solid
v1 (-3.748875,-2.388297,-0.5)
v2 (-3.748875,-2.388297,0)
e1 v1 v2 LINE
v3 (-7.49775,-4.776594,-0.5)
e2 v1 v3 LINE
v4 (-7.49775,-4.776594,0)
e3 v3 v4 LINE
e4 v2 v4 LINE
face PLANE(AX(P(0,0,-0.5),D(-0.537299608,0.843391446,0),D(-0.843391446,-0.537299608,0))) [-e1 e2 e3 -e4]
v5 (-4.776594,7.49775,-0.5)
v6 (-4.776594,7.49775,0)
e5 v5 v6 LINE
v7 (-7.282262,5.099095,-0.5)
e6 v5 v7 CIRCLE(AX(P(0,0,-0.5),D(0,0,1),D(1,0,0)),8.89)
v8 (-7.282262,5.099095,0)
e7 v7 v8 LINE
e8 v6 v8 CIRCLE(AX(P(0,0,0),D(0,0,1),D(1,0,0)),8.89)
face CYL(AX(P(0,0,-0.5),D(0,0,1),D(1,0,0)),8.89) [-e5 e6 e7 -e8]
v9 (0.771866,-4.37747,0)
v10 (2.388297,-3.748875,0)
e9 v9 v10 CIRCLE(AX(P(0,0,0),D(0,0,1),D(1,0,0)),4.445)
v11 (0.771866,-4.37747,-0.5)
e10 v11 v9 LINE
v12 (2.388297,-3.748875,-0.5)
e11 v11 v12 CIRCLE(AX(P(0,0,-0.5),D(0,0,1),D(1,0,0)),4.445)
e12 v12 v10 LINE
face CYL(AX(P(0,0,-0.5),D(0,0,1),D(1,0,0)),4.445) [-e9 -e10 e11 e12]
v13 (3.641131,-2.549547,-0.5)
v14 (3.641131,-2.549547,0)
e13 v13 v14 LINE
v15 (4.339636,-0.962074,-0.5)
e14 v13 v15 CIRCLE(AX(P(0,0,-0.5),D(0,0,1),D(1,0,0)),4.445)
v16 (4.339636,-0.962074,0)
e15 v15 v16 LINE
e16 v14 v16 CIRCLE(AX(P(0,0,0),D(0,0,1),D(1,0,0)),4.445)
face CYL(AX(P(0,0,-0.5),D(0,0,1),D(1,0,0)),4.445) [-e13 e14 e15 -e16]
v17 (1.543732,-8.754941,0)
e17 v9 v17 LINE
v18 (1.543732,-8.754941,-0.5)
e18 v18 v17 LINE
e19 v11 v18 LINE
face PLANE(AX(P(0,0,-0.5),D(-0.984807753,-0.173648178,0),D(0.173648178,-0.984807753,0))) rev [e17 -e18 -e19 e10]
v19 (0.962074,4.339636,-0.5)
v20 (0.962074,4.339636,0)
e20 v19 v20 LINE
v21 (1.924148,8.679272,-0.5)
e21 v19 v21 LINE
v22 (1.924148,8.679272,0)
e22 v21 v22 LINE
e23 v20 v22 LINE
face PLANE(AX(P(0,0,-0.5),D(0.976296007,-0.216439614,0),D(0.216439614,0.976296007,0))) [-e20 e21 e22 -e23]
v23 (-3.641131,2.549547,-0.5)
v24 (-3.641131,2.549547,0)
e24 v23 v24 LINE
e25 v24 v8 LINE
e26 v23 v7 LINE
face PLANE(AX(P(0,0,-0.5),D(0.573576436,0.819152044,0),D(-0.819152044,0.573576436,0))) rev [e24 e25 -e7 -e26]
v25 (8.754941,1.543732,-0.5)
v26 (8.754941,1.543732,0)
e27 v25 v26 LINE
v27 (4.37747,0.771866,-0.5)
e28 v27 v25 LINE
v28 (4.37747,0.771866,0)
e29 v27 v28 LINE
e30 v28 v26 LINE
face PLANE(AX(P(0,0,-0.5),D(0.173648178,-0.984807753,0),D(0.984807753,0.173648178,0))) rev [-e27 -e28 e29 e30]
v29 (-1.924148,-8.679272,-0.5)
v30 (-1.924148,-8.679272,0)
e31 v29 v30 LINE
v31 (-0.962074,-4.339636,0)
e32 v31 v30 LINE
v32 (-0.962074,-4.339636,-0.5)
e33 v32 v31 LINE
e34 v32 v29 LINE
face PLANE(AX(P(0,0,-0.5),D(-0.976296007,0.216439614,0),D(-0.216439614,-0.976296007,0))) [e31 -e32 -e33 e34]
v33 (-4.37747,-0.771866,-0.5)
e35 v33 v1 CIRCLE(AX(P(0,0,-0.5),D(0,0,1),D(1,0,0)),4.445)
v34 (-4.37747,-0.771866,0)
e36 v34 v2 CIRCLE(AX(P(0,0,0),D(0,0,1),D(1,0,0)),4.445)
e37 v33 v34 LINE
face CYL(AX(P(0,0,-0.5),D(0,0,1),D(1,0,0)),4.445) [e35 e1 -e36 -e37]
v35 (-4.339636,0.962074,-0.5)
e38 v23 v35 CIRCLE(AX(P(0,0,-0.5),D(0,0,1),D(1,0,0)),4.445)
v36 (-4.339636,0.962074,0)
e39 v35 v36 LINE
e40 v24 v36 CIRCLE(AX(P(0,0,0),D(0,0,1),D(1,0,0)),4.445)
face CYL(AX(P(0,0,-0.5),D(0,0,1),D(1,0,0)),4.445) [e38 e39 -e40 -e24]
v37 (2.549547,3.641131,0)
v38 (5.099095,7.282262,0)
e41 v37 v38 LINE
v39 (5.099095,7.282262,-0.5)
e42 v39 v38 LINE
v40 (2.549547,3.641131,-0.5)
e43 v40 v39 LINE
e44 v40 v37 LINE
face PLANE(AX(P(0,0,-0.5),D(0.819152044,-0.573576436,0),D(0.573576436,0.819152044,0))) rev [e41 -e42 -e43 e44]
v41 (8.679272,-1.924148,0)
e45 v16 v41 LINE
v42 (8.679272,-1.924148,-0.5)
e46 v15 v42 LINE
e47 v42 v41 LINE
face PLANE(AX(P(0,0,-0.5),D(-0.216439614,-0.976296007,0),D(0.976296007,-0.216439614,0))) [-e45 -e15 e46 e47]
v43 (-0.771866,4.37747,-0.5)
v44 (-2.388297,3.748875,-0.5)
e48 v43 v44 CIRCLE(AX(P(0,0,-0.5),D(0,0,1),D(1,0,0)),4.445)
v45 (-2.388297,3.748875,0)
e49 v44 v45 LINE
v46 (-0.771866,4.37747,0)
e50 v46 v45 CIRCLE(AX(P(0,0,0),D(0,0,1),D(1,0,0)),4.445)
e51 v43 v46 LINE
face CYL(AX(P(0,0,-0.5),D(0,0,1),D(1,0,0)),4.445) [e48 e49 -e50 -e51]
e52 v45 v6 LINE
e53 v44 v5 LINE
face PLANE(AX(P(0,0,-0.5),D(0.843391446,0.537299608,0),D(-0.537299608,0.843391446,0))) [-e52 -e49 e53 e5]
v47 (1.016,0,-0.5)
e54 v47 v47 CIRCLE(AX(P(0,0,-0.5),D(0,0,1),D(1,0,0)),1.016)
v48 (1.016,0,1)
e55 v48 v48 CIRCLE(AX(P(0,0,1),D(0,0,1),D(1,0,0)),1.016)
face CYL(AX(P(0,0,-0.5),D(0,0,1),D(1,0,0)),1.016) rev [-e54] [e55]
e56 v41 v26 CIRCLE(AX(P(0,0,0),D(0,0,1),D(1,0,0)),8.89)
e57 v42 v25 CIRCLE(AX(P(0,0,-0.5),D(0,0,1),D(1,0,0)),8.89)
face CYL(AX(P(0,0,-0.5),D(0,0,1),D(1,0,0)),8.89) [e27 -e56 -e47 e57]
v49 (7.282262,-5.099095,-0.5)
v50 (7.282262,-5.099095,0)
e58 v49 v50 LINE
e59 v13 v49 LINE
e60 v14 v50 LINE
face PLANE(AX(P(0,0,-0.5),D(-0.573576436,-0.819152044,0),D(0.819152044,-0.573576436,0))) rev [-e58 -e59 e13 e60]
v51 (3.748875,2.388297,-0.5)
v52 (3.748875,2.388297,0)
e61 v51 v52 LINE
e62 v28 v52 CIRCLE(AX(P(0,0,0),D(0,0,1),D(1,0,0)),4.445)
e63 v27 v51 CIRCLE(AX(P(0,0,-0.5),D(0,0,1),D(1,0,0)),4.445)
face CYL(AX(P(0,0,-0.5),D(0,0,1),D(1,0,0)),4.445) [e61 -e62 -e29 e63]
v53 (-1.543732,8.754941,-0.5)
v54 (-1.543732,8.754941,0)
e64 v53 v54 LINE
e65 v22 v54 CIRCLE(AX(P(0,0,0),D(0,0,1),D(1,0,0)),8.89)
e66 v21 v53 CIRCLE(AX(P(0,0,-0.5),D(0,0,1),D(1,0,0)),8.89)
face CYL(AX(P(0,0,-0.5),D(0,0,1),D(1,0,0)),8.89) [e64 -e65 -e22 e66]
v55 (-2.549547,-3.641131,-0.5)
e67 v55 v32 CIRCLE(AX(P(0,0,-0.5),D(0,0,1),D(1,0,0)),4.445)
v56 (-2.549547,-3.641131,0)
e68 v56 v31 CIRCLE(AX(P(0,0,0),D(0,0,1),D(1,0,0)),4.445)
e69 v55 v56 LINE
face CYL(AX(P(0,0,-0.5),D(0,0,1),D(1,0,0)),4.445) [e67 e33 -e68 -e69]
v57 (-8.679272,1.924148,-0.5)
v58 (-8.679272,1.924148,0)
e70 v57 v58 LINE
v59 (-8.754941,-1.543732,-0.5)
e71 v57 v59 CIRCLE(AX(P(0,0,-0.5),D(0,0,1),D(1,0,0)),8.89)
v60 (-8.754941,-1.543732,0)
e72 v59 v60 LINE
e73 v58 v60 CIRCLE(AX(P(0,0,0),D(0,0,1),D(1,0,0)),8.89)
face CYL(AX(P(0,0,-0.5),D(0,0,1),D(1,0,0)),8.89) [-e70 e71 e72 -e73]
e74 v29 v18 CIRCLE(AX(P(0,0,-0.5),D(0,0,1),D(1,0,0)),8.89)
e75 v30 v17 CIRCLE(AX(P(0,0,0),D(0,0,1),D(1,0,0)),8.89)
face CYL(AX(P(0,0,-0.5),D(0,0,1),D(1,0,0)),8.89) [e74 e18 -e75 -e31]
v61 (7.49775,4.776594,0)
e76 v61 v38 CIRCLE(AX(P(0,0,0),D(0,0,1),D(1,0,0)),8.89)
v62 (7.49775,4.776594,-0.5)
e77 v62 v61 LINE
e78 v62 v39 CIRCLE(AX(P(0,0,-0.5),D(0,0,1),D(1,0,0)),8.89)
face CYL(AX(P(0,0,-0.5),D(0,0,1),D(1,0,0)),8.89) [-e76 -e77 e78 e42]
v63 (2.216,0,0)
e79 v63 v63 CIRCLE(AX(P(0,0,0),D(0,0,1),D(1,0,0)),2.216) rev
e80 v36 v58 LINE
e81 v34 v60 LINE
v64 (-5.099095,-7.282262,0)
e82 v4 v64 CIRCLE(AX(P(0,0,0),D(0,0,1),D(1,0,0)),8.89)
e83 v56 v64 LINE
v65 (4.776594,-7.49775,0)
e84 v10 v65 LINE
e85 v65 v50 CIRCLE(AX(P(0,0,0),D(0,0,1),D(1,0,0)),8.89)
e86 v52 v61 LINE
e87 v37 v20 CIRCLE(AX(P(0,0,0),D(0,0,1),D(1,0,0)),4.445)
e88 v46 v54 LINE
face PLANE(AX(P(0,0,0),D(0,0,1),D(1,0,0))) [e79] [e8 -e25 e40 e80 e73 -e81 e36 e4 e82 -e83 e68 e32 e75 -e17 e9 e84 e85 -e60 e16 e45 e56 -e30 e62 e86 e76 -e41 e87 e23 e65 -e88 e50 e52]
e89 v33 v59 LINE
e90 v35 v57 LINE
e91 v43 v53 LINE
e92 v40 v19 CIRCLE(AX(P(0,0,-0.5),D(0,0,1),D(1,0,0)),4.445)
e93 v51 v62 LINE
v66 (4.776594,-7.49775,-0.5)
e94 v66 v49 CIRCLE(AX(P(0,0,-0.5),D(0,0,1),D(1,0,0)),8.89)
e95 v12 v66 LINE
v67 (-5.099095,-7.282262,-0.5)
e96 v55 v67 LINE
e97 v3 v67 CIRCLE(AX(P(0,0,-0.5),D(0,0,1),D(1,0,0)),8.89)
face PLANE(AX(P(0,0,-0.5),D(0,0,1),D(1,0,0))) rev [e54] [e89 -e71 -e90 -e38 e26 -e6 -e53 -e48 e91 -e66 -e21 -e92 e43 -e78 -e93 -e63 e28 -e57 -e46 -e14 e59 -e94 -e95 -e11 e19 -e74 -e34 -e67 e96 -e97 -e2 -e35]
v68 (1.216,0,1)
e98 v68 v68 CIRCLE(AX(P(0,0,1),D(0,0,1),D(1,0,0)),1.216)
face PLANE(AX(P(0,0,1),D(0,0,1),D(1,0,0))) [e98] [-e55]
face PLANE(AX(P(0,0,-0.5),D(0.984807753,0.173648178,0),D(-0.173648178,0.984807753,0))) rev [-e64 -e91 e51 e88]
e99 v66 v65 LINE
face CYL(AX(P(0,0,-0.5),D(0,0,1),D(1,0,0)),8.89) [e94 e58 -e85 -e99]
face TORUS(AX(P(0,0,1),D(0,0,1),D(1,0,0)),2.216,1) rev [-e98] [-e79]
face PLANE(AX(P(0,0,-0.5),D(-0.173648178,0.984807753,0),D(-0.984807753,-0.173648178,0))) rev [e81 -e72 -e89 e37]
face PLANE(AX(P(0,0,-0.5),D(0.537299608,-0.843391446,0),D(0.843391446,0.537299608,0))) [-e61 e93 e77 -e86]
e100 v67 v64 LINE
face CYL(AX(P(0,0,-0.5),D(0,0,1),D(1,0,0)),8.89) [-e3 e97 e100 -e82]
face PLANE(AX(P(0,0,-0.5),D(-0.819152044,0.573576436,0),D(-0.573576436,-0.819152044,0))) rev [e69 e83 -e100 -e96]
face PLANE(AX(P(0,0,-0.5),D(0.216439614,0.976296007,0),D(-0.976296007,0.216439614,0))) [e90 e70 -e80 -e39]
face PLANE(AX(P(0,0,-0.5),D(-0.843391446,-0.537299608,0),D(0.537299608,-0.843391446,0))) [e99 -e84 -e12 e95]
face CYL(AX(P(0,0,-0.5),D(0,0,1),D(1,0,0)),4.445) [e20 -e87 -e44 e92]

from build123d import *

# Parameters (mm, degrees)
SKETCH1_R           = 8.89
SKETCH1_R_2         = 1.016
BOSS_EXTRUDE1_DEPTH = 0.5
CUT_EXTRUDE1_DEPTH  = 0.5
BOSS_EXTRUDE2_START = 1
SKETCH3_R           = 1.216
SKETCH3_R_2         = 1.016
BOSS_EXTRUDE2_DEPTH = 1
FILLET1_R           = 1


with BuildPart() as part:
    # Sketch1 → Boss-Extrude1 (new body)
    with BuildSketch(Plane.XY):
        Circle(SKETCH1_R)
        Circle(SKETCH1_R_2, mode=Mode.SUBTRACT)
    extrude(amount=-BOSS_EXTRUDE1_DEPTH)

    # Sketch2 → Cut-Extrude1 (cut)
    with BuildSketch(Plane.XY):
        with BuildLine():
            ThreePointArc((-2.388296759, 3.748874977), (-1.61103708, 4.142774979), (-0.77186615, 4.377470462))
            Line((-0.77186615, 4.377470462), (-1.543732299, 8.754940924))
            ThreePointArc((-1.543732299, 8.754940924), (-3.22207416, 8.285549958), (-4.776593518, 7.497749953))
            Line((-4.776593518, 7.497749953), (-2.388296759, 3.748874977))
        make_face()
        with BuildLine():
            ThreePointArc((5.099094519, 7.282261674), (3.580418073, 8.137119049), (1.924148168, 8.679271503))
            Line((1.924148168, 8.679271503), (0.962074084, 4.339635752))
            ThreePointArc((0.962074084, 4.339635752), (1.790209036, 4.068559525), (2.54954726, 3.641130837))
            Line((2.54954726, 3.641130837), (5.099094519, 7.282261674))
        make_face()
        with BuildLine():
            ThreePointArc((8.754940924, 1.543732299), (8.285549958, 3.22207416), (7.497749953, 4.776593518))
            Line((7.497749953, 4.776593518), (3.748874977, 2.388296759))
            ThreePointArc((3.748874977, 2.388296759), (4.142774979, 1.61103708), (4.377470462, 0.77186615))
            Line((4.377470462, 0.77186615), (8.754940924, 1.543732299))
        make_face()
        with BuildLine():
            ThreePointArc((7.282261674, -5.099094519), (8.137119049, -3.580418073), (8.679271503, -1.924148168))
            Line((8.679271503, -1.924148168), (4.339635752, -0.962074084))
            ThreePointArc((4.339635752, -0.962074084), (4.068559525, -1.790209036), (3.641130837, -2.54954726))
            Line((3.641130837, -2.54954726), (7.282261674, -5.099094519))
        make_face()
        with BuildLine():
            ThreePointArc((1.543732299, -8.754940924), (3.22207416, -8.285549958), (4.776593518, -7.497749953))
            Line((4.776593518, -7.497749953), (2.388296759, -3.748874977))
            ThreePointArc((2.388296759, -3.748874977), (1.61103708, -4.142774979), (0.77186615, -4.377470462))
            Line((0.77186615, -4.377470462), (1.543732299, -8.754940924))
        make_face()
        with BuildLine():
            Line((-2.54954726, -3.641130837), (-5.099094519, -7.282261674))
            ThreePointArc((-5.099094519, -7.282261674), (-3.580418073, -8.137119049), (-1.924148168, -8.679271503))
            Line((-1.924148168, -8.679271503), (-0.962074084, -4.339635752))
            ThreePointArc((-0.962074084, -4.339635752), (-1.790209036, -4.068559525), (-2.54954726, -3.641130837))
        make_face()
        with BuildLine():
            Line((-4.377470462, -0.77186615), (-8.754940924, -1.543732299))
            ThreePointArc((-8.754940924, -1.543732299), (-8.285549958, -3.22207416), (-7.497749953, -4.776593518))
            Line((-7.497749953, -4.776593518), (-3.748874977, -2.388296759))
            ThreePointArc((-3.748874977, -2.388296759), (-4.142774979, -1.61103708), (-4.377470462, -0.77186615))
        make_face()
        with BuildLine():
            Line((-3.641130837, 2.54954726), (-7.282261674, 5.099094519))
            ThreePointArc((-7.282261674, 5.099094519), (-8.137119049, 3.580418073), (-8.679271503, 1.924148168))
            Line((-8.679271503, 1.924148168), (-4.339635752, 0.962074084))
            ThreePointArc((-4.339635752, 0.962074084), (-4.068559525, 1.790209036), (-3.641130837, 2.54954726))
        make_face()
    extrude(amount=-CUT_EXTRUDE1_DEPTH, mode=Mode.SUBTRACT)

    # Sketch3 → Boss-Extrude2 (add)
    with BuildSketch(Plane.XY.offset(BOSS_EXTRUDE2_START)):
        Circle(SKETCH3_R)
        Circle(SKETCH3_R_2, mode=Mode.SUBTRACT)
    extrude(amount=-BOSS_EXTRUDE2_DEPTH)

    # Fillet1
    fillet1_edges = [part.edges().sort_by_distance(p)[0] for p in [
        (-1.216, 0, 0),
    ]]
    fillet(fillet1_edges, radius=FILLET1_R - 0.0001)  # a hair under: the kernel refuses the full size


solid = part.part
